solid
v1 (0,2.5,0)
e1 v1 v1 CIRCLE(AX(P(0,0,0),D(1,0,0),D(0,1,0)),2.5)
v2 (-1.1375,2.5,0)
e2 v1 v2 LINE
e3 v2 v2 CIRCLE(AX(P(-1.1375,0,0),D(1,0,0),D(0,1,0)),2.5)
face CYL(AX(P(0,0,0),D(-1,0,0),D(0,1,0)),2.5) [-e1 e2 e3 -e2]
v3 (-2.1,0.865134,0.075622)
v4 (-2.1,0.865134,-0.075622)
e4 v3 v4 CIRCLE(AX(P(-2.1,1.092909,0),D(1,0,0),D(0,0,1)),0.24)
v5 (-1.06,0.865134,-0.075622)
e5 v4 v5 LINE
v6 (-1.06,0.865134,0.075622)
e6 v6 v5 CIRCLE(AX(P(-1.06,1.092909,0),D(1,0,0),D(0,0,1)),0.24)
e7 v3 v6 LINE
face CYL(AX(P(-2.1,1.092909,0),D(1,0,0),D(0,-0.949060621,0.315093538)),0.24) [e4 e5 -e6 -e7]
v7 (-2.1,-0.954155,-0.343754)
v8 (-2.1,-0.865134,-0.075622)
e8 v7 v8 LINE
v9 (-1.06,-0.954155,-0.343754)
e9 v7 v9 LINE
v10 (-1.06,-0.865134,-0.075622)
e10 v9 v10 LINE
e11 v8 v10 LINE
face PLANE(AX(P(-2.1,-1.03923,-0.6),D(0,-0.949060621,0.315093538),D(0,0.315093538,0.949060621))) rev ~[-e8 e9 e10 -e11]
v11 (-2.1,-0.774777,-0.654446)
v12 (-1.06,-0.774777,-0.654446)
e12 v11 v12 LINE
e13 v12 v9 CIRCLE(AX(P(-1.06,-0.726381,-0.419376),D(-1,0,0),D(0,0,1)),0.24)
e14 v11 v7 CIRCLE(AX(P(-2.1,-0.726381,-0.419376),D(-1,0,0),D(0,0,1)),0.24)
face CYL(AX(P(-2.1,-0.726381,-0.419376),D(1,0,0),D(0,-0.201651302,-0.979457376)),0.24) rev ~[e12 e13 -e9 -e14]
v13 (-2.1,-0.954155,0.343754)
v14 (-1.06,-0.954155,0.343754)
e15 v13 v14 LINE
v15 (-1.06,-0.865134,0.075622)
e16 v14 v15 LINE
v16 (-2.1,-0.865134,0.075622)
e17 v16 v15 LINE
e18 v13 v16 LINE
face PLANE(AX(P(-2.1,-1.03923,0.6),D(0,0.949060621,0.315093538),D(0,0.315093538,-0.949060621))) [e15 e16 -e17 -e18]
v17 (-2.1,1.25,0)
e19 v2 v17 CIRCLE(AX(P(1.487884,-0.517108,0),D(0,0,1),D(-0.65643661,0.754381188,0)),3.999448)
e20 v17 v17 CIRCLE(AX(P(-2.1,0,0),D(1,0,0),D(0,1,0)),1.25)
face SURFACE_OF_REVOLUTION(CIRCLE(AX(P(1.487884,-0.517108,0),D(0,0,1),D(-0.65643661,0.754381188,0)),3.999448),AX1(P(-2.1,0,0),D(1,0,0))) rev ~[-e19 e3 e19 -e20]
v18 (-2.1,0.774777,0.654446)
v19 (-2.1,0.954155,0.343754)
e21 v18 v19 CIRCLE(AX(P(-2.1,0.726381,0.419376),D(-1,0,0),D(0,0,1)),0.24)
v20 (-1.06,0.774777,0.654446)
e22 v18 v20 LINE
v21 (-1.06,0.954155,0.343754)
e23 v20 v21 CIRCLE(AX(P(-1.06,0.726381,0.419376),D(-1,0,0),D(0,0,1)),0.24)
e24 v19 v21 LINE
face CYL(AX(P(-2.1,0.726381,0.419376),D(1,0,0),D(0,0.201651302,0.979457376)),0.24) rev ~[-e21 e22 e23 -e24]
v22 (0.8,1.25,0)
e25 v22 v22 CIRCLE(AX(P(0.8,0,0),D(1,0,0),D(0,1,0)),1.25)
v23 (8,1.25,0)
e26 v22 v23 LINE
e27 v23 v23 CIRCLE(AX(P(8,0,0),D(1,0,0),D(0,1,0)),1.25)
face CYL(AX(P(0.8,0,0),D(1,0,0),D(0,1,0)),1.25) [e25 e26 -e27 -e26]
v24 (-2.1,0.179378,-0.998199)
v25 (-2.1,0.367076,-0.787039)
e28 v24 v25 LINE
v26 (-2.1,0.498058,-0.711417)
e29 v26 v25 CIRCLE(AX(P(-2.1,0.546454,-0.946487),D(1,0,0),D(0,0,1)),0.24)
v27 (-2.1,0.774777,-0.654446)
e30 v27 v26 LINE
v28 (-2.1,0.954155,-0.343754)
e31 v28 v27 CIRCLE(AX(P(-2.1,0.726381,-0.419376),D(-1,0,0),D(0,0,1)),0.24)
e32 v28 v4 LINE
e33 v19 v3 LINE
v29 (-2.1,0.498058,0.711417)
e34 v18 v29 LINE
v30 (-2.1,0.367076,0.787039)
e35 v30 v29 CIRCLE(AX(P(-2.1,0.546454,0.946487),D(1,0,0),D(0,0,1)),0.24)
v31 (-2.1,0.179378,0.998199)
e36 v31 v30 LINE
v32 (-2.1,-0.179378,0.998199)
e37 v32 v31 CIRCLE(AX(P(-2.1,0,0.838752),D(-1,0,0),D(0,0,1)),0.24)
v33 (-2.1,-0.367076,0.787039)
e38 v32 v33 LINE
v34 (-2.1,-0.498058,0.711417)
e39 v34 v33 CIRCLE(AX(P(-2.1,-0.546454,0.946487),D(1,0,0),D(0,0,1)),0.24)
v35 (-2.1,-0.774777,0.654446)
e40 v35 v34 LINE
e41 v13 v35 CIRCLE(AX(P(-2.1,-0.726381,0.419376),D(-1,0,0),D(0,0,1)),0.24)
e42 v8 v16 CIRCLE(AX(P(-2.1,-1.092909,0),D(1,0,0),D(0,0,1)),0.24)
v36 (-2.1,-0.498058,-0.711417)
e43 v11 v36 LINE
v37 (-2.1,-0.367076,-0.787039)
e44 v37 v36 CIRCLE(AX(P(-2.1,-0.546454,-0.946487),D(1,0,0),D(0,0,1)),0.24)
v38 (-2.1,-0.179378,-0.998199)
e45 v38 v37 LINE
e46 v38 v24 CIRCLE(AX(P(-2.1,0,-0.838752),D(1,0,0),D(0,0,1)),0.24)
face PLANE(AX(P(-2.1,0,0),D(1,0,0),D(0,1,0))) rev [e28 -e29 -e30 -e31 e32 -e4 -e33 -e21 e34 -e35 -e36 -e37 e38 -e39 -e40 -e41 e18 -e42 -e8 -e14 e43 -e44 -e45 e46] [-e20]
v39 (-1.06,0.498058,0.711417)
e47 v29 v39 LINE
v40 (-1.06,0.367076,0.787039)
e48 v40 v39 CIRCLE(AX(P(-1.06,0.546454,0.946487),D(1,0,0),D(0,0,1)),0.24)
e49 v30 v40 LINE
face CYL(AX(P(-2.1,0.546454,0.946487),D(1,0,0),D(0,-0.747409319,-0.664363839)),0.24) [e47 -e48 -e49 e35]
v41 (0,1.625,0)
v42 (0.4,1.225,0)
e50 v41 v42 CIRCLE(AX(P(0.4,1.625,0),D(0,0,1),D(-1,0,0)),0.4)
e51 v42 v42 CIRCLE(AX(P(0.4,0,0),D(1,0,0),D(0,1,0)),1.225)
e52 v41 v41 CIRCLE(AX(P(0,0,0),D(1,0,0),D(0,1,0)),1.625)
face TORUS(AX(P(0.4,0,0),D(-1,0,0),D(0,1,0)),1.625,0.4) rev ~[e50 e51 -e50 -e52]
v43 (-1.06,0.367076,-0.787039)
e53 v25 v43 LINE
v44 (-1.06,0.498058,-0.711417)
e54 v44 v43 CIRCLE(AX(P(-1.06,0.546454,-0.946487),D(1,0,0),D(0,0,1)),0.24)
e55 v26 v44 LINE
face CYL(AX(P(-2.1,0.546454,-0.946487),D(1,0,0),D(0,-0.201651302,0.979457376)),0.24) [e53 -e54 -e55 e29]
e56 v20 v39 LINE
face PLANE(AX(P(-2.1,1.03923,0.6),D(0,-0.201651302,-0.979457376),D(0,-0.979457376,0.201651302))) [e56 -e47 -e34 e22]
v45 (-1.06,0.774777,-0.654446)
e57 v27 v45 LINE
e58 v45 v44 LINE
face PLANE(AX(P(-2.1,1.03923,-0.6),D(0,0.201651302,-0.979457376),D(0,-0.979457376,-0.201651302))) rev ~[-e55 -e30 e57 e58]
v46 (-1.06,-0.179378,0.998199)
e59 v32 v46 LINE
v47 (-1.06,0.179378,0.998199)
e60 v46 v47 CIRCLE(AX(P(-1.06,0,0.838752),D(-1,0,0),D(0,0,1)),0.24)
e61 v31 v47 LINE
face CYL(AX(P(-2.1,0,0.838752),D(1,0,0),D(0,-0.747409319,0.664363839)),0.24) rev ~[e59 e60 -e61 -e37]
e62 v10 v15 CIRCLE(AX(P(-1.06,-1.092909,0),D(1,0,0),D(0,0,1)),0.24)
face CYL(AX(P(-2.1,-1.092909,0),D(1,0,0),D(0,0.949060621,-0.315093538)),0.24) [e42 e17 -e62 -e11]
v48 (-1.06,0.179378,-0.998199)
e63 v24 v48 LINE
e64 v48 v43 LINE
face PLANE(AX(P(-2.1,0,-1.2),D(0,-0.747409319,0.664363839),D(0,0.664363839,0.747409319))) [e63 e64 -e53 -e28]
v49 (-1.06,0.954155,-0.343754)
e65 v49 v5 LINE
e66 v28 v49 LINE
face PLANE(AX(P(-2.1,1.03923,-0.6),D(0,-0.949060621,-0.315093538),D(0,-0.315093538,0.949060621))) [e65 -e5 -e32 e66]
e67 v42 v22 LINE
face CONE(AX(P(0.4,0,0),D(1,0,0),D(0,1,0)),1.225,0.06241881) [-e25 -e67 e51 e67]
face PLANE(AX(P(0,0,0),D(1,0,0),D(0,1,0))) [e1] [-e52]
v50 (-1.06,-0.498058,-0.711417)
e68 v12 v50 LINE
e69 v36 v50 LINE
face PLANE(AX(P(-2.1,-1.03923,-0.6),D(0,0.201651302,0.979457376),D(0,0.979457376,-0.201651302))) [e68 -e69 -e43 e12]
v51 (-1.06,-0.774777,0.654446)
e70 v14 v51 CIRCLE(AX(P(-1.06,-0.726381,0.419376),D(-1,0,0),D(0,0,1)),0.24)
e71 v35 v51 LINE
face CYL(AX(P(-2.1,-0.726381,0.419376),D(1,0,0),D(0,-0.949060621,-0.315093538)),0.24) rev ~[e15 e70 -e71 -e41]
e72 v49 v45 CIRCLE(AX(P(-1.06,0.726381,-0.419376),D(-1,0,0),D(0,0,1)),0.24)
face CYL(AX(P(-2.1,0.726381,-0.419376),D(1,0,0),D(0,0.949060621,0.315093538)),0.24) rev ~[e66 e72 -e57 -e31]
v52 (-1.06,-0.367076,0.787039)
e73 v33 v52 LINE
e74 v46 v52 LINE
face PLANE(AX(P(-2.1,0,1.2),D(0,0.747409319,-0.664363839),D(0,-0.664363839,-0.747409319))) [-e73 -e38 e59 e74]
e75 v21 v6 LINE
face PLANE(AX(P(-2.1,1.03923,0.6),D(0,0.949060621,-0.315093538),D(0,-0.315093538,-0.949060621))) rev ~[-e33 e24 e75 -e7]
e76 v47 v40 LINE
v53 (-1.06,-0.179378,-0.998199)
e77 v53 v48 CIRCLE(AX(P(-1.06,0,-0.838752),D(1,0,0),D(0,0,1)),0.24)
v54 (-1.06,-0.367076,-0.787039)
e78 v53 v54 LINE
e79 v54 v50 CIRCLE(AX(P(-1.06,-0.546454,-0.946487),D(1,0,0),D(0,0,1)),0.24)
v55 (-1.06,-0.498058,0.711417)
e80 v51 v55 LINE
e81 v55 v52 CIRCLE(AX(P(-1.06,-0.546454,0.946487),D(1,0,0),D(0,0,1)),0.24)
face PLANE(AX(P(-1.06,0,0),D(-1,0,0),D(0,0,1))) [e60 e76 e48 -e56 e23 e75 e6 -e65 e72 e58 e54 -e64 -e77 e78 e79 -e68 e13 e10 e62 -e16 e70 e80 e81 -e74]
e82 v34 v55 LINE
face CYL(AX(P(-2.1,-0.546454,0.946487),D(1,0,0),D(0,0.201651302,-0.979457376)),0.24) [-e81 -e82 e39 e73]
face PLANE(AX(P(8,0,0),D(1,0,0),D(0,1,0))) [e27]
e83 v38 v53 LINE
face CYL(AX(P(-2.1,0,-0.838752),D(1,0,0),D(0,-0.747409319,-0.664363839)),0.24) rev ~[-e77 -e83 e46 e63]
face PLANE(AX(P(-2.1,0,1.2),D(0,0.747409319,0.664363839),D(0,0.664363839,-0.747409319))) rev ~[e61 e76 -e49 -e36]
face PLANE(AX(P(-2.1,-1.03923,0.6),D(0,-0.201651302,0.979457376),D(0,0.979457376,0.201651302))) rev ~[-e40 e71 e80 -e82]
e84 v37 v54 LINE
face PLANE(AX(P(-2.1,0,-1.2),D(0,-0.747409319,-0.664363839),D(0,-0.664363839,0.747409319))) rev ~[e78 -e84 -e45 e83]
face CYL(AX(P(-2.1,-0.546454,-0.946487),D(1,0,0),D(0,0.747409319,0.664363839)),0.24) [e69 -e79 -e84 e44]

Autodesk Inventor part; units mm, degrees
ref_plane "YZ Plane" through (0, 0, 0) normal (1, 0, 0) x (0, 1, 0)
ref_plane "XZ Plane" through (0, 0, 0) normal (0, 1, 0) x (-1, 0, 0)
ref_plane "XY Plane" through (0, 0, 0) normal (0, 0, 1) x (1, 0, 0)
sketch "Sketch4" plane through (0, 0, 0) normal (0, 0, 1) x (1, 0, 0)
  line L0 (-2.1, 0) -> (8, 0)
  line L1 (0, 0) -> (-2.1, 0)
  line L2 (0, 2.5) -> (0, 1.625)
  line L3 (0.4, 1.225) -> (0.4, 1.225)
  line L4 (0.4, 1.225) -> (0.8, 1.25)
  arc A0 (0, 1.625) -> (0.4, 1.225) centre (0.4, 1.625) ccw
  line L5 (-2.1, 0) -> (-2.1, 1.25)
  line L6 (0, 2.5) -> (-1.1375, 2.5)
  arc A1 (-1.1375, 2.5) -> (-2.1, 1.25) centre (1.4883, -0.5175) ccw
  line L7 (0.8, 1.25) -> (8, 1.25)
  line L8 (8, 1.25) -> (8, 0)
  point P0 (0, 1.225)
  dimension "d71" = 0.4
  dimension "d72" = 8
  dimension "d74" = 0.4
  dimension "d75" = 2.45
  dimension "d78" = 2.5
  dimension "d82" = 4
  dimension "d83" = 2.1
  dimension "d84" = 5
  dimension "d104" = 7.2
  dimension "d105" = 2.5
revolve "Revolution7" add sketch "Sketch4" angle 360 about axis through (-2.1, 0, 0) along (1, 0, 0)
sketch "Sketch5" plane through (-2.1, 0, 0) normal (-1, 0, 0) x (0, 0, 1)
  circle A0 centre (0, 0) radius 1.2 construction
  circle A1 centre (0, 0) radius 0.84 construction
  line L0 (0, 0) -> (-0.7275, 0.42)
  line L1 (0, 0) -> (-0.7275, -0.42)
  line L2 (-1.8008, 0) -> (1.7887, 0)
  line L3 (-1.2, 0) -> (-0.7275, -0.42)
  line L4 (-1.2, 0) -> (-0.7275, 0.42)
  dimension "d88" = 2.4
  dimension "d89" = 1.68
  dimension "d90" = 30
  dimension "d91" = 30
extrude "Extrusion1" cut sketch "Sketch5" against normal blind 1.04
pattern_circular "Circular Pattern1" count 6 over 360 about axis through (-10, 0, 0) along (1, 0, 0) of "Extrusion1"
fillet "Fillet1" radius 0.24 12 edges at (-1.58, -1.0392, -0.6) (-1.58, -0.42, -0.7275) (-1.58, -0.84, 0) (-1.58, -1.0392, 0.6) (-1.58, -0.42, 0.7275) (-1.58, 0, 1.2) (-1.58, 0.84, 0) (-1.58, 1.0392, 0.6) (-1.58, 0.42, 0.7275) (-1.58, 0.42, -0.7275) (-1.58, 0, -1.2) (-1.58, 1.0392, -0.6)
thread "Thread7" size "M2.5x0.45" class "6g" standard "ISO Metric profile" length 7.2
properties part number "Flachkopfschraube mit Innenrund ISO 14583 - M2,5 x 8 - A3-70" material "Edelstahl"
